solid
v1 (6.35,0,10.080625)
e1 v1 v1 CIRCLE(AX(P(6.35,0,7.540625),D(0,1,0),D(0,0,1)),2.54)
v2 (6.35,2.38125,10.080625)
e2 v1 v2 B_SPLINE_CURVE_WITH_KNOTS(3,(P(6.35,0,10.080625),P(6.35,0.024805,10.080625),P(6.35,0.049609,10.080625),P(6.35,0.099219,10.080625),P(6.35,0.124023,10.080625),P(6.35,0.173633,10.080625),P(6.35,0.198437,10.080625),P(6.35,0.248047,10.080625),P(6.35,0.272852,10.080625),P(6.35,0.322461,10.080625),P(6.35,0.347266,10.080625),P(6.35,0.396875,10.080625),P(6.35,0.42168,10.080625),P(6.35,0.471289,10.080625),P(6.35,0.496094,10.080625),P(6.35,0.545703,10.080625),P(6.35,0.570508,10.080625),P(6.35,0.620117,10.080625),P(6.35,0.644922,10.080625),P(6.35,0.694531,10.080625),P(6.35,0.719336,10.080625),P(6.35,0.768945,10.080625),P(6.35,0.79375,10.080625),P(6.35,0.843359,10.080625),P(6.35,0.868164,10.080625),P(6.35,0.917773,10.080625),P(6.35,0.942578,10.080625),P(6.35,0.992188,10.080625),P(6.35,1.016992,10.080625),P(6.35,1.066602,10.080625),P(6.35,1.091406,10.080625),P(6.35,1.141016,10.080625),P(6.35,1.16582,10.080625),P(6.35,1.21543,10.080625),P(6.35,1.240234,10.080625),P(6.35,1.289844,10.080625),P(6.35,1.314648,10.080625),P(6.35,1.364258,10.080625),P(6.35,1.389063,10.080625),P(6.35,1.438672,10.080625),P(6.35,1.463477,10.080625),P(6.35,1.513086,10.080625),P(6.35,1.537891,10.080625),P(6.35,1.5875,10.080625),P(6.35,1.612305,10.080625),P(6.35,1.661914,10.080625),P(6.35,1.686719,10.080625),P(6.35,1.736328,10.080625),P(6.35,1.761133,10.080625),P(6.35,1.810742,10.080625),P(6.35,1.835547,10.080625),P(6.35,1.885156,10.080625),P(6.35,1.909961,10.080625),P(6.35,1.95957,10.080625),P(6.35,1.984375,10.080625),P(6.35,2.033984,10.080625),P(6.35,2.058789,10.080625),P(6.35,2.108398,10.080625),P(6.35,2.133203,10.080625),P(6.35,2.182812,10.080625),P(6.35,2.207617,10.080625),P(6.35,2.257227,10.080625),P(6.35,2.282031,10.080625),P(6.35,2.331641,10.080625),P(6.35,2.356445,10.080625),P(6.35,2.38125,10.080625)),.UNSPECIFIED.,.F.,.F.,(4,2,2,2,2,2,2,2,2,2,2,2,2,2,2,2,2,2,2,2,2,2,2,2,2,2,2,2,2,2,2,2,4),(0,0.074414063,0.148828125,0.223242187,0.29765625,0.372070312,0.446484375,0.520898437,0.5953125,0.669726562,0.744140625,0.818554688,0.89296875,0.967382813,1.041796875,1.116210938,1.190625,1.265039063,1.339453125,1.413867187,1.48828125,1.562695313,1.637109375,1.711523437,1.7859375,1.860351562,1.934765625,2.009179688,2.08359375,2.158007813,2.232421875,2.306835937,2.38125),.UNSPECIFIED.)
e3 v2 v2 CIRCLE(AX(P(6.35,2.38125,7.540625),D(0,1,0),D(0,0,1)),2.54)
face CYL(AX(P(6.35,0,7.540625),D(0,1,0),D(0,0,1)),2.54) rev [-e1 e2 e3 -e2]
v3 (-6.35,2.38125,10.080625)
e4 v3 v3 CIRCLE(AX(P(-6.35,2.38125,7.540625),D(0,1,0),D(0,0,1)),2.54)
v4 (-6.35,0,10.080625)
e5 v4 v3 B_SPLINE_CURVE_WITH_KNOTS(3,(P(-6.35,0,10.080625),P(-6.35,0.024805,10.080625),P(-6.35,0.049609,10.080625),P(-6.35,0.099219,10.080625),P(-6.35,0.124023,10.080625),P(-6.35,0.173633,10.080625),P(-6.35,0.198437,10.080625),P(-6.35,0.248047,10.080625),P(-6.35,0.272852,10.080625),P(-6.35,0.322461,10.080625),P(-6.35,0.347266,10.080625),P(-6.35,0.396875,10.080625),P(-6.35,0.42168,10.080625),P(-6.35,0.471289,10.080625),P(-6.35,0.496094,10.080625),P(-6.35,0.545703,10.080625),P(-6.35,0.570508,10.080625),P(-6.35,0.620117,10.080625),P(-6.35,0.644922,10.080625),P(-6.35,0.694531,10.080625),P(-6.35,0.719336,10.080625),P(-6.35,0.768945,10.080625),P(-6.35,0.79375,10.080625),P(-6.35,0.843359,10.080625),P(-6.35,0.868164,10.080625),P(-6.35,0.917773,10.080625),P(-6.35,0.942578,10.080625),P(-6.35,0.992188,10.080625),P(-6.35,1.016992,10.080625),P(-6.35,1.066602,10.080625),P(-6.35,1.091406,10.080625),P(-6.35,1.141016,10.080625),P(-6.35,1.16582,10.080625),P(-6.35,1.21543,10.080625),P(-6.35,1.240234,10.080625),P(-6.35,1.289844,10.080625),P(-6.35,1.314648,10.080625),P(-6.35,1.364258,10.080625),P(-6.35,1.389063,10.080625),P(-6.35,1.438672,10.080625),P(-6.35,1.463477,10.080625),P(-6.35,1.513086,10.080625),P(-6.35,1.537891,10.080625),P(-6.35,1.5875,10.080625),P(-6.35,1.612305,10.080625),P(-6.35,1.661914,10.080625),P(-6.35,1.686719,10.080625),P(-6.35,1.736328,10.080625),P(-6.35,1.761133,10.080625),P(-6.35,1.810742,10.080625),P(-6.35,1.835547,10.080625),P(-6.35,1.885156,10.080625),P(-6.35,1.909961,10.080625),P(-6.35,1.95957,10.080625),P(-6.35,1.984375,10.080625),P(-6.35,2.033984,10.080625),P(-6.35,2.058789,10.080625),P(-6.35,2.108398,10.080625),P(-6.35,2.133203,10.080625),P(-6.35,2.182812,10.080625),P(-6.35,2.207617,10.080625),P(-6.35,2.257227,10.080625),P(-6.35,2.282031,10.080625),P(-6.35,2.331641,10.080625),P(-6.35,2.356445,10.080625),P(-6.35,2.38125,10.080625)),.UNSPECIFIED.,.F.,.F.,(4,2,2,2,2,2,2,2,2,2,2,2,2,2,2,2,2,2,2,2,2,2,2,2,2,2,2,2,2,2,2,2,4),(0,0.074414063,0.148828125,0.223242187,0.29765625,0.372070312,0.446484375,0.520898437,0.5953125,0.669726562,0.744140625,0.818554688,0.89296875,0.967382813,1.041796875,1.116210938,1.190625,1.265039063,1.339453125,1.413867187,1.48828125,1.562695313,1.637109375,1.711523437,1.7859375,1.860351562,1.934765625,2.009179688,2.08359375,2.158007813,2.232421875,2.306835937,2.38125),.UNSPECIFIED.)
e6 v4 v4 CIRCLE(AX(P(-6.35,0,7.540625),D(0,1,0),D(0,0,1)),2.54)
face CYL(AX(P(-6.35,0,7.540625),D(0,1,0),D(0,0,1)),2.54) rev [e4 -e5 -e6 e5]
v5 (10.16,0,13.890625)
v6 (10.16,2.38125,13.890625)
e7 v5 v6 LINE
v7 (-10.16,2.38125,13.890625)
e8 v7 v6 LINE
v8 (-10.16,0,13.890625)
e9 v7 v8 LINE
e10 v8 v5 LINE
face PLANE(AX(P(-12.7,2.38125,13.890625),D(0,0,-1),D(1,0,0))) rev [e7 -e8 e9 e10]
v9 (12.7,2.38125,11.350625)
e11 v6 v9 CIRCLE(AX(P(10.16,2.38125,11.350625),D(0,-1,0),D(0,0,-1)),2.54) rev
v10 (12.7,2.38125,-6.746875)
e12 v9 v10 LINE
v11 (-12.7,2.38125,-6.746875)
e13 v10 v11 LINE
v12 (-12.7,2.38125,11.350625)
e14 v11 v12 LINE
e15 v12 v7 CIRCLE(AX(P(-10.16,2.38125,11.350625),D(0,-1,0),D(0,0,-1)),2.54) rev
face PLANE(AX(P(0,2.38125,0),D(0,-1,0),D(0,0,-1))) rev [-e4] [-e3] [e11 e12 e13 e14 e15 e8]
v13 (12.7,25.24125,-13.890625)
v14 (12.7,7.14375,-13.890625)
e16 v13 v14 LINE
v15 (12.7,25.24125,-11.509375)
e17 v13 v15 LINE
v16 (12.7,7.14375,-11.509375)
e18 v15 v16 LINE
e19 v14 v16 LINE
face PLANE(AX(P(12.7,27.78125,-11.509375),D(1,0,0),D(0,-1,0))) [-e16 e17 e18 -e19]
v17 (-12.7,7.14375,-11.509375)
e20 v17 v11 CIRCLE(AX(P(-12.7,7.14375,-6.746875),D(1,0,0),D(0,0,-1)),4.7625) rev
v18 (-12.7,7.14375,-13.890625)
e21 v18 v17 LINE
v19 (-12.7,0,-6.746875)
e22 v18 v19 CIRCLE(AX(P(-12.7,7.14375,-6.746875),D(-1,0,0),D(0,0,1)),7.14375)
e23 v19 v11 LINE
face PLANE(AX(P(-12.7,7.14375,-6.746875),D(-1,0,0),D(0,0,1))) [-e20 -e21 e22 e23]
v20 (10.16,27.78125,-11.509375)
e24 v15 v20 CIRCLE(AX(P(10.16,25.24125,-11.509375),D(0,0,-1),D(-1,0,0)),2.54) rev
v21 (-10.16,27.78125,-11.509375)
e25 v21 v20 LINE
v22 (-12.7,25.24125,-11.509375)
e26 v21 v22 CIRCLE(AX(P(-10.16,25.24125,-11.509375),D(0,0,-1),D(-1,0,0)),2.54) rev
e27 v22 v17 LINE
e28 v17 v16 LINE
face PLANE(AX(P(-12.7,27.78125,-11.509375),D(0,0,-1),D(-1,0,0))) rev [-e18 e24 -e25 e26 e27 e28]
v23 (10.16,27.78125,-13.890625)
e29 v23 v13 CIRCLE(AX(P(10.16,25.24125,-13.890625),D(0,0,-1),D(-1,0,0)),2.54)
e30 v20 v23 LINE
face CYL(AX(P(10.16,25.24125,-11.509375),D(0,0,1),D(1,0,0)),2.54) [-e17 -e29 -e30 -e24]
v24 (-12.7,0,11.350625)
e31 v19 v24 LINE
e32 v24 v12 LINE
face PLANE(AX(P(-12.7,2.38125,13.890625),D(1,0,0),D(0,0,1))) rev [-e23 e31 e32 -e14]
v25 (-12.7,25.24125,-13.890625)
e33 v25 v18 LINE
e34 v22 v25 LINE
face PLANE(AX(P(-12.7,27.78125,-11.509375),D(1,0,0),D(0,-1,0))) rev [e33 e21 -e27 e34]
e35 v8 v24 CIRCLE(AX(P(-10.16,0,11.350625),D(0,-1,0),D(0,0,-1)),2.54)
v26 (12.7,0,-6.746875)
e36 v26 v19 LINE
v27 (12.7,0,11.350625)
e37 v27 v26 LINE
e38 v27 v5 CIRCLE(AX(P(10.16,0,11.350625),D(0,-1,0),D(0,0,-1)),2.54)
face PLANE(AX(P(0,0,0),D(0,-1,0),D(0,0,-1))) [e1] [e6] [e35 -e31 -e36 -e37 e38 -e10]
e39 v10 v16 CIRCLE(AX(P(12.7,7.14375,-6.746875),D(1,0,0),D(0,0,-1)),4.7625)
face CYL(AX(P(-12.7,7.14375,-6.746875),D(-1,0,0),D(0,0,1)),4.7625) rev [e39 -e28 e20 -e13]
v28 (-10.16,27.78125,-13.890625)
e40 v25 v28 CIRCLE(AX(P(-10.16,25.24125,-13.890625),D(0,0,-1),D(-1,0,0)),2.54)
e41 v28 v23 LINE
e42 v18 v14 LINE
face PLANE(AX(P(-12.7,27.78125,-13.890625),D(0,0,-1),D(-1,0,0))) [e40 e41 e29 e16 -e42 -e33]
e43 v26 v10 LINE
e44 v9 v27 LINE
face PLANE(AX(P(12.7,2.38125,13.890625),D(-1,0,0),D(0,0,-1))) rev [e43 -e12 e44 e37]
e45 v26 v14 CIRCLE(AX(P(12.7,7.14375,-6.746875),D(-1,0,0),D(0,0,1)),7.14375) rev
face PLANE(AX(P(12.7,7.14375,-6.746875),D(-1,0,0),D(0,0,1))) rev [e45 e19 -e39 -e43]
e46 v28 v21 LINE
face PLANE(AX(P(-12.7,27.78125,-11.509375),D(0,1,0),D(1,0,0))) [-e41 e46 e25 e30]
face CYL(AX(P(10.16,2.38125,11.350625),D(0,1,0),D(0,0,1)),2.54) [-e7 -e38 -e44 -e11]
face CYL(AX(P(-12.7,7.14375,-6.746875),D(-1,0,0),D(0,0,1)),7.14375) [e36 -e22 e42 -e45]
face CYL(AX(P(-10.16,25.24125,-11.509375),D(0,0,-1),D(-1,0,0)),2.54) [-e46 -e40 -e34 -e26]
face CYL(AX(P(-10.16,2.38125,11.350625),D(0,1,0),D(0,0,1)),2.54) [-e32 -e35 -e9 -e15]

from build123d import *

# Parameters (mm, degrees)
SKETCH1_W              = 25.4
SKETCH1_H              = 27.78125
BOSS_EXTRUDE1_DEPTH    = 2.38125
SKETCH2_W              = 25.4
SKETCH2_H              = 2.38125
BOSS_EXTRUDE2_DEPTH    = 25.4
CONVERT_SOLID2_START   = -12.7
CONVERT_SOLID2_DEPTH   = 25.4
CONVERT_SOLID2_2_DEPTH = 25.4
FILLET1_R              = 2.54
SKETCH9_R              = 2.54
CUT_EXTRUDE1_DEPTH     = 2.38125


# Read off the part's stored shape, not the designer's step: Convert-Solid2
with BuildPart() as part:
    # Sketch1 → Boss-Extrude1 (new body)
    with BuildSketch(Plane(origin=(0, 0, 0), x_dir=(1, 0, 0), z_dir=(0, 1, 0))):
        Rectangle(SKETCH1_W, SKETCH1_H)
    extrude(amount=BOSS_EXTRUDE1_DEPTH)

    # Sketch2 → Boss-Extrude2 (add)
    with BuildSketch(Plane(origin=(0, 2.38125, 0), x_dir=(1, 0, 0), z_dir=(0, 1, 0))):
        with Locations((0, 12.7)):
            Rectangle(SKETCH2_W, SKETCH2_H)
    extrude(amount=BOSS_EXTRUDE2_DEPTH)

    # Convert-Solid2 outline → Convert-Solid2 (cut)
    with BuildSketch(Plane.YZ.offset(CONVERT_SOLID2_START)):
        with BuildLine():
            Line((0, -13.890625), (7.14375, -13.890625))
            ThreePointArc((7.14375, -13.890625), (2.092355932, -11.798269068), (0, -6.746875))
            Line((0, -6.746875), (0, -13.890625))
        make_face()
    extrude(amount=CONVERT_SOLID2_DEPTH, mode=Mode.SUBTRACT)

    # Convert-Solid2 2 outline → Convert-Solid2 2 (add)
    with BuildSketch(Plane.YZ.offset(CONVERT_SOLID2_START)):
        with BuildLine():
            Line((2.38125, -11.509375), (7.14375, -11.509375))
            ThreePointArc((7.14375, -11.509375), (3.776153955, -10.114471045), (2.38125, -6.746875))
            Line((2.38125, -6.746875), (2.38125, -11.509375))
        make_face()
    extrude(amount=CONVERT_SOLID2_2_DEPTH)

    # Fillet1
    fillet1_edges = [part.edges().sort_by_distance(p)[0] for p in [
        (-12.7, 1.190625, 13.890625),
        (12.7, 1.190625, 13.890625),
        (-12.7, 27.78125, -12.7),
        (12.7, 27.78125, -12.7),
    ]]
    fillet(fillet1_edges, radius=FILLET1_R)

    # Sketch9 → Cut-Extrude1 (cut)
    with BuildSketch(Plane(origin=(0, 2.38125, 0), x_dir=(1, 0, 0), z_dir=(0, 1, 0))):
        with Locations(Location((6.35, -7.540625, 0), (0, 0, 270))):
            Circle(SKETCH9_R)
        with Locations(Location((-6.35, -7.540625, 0), (0, 0, 270))):
            Circle(SKETCH9_R)
    extrude(amount=-CUT_EXTRUDE1_DEPTH, mode=Mode.SUBTRACT)


solid = part.part
